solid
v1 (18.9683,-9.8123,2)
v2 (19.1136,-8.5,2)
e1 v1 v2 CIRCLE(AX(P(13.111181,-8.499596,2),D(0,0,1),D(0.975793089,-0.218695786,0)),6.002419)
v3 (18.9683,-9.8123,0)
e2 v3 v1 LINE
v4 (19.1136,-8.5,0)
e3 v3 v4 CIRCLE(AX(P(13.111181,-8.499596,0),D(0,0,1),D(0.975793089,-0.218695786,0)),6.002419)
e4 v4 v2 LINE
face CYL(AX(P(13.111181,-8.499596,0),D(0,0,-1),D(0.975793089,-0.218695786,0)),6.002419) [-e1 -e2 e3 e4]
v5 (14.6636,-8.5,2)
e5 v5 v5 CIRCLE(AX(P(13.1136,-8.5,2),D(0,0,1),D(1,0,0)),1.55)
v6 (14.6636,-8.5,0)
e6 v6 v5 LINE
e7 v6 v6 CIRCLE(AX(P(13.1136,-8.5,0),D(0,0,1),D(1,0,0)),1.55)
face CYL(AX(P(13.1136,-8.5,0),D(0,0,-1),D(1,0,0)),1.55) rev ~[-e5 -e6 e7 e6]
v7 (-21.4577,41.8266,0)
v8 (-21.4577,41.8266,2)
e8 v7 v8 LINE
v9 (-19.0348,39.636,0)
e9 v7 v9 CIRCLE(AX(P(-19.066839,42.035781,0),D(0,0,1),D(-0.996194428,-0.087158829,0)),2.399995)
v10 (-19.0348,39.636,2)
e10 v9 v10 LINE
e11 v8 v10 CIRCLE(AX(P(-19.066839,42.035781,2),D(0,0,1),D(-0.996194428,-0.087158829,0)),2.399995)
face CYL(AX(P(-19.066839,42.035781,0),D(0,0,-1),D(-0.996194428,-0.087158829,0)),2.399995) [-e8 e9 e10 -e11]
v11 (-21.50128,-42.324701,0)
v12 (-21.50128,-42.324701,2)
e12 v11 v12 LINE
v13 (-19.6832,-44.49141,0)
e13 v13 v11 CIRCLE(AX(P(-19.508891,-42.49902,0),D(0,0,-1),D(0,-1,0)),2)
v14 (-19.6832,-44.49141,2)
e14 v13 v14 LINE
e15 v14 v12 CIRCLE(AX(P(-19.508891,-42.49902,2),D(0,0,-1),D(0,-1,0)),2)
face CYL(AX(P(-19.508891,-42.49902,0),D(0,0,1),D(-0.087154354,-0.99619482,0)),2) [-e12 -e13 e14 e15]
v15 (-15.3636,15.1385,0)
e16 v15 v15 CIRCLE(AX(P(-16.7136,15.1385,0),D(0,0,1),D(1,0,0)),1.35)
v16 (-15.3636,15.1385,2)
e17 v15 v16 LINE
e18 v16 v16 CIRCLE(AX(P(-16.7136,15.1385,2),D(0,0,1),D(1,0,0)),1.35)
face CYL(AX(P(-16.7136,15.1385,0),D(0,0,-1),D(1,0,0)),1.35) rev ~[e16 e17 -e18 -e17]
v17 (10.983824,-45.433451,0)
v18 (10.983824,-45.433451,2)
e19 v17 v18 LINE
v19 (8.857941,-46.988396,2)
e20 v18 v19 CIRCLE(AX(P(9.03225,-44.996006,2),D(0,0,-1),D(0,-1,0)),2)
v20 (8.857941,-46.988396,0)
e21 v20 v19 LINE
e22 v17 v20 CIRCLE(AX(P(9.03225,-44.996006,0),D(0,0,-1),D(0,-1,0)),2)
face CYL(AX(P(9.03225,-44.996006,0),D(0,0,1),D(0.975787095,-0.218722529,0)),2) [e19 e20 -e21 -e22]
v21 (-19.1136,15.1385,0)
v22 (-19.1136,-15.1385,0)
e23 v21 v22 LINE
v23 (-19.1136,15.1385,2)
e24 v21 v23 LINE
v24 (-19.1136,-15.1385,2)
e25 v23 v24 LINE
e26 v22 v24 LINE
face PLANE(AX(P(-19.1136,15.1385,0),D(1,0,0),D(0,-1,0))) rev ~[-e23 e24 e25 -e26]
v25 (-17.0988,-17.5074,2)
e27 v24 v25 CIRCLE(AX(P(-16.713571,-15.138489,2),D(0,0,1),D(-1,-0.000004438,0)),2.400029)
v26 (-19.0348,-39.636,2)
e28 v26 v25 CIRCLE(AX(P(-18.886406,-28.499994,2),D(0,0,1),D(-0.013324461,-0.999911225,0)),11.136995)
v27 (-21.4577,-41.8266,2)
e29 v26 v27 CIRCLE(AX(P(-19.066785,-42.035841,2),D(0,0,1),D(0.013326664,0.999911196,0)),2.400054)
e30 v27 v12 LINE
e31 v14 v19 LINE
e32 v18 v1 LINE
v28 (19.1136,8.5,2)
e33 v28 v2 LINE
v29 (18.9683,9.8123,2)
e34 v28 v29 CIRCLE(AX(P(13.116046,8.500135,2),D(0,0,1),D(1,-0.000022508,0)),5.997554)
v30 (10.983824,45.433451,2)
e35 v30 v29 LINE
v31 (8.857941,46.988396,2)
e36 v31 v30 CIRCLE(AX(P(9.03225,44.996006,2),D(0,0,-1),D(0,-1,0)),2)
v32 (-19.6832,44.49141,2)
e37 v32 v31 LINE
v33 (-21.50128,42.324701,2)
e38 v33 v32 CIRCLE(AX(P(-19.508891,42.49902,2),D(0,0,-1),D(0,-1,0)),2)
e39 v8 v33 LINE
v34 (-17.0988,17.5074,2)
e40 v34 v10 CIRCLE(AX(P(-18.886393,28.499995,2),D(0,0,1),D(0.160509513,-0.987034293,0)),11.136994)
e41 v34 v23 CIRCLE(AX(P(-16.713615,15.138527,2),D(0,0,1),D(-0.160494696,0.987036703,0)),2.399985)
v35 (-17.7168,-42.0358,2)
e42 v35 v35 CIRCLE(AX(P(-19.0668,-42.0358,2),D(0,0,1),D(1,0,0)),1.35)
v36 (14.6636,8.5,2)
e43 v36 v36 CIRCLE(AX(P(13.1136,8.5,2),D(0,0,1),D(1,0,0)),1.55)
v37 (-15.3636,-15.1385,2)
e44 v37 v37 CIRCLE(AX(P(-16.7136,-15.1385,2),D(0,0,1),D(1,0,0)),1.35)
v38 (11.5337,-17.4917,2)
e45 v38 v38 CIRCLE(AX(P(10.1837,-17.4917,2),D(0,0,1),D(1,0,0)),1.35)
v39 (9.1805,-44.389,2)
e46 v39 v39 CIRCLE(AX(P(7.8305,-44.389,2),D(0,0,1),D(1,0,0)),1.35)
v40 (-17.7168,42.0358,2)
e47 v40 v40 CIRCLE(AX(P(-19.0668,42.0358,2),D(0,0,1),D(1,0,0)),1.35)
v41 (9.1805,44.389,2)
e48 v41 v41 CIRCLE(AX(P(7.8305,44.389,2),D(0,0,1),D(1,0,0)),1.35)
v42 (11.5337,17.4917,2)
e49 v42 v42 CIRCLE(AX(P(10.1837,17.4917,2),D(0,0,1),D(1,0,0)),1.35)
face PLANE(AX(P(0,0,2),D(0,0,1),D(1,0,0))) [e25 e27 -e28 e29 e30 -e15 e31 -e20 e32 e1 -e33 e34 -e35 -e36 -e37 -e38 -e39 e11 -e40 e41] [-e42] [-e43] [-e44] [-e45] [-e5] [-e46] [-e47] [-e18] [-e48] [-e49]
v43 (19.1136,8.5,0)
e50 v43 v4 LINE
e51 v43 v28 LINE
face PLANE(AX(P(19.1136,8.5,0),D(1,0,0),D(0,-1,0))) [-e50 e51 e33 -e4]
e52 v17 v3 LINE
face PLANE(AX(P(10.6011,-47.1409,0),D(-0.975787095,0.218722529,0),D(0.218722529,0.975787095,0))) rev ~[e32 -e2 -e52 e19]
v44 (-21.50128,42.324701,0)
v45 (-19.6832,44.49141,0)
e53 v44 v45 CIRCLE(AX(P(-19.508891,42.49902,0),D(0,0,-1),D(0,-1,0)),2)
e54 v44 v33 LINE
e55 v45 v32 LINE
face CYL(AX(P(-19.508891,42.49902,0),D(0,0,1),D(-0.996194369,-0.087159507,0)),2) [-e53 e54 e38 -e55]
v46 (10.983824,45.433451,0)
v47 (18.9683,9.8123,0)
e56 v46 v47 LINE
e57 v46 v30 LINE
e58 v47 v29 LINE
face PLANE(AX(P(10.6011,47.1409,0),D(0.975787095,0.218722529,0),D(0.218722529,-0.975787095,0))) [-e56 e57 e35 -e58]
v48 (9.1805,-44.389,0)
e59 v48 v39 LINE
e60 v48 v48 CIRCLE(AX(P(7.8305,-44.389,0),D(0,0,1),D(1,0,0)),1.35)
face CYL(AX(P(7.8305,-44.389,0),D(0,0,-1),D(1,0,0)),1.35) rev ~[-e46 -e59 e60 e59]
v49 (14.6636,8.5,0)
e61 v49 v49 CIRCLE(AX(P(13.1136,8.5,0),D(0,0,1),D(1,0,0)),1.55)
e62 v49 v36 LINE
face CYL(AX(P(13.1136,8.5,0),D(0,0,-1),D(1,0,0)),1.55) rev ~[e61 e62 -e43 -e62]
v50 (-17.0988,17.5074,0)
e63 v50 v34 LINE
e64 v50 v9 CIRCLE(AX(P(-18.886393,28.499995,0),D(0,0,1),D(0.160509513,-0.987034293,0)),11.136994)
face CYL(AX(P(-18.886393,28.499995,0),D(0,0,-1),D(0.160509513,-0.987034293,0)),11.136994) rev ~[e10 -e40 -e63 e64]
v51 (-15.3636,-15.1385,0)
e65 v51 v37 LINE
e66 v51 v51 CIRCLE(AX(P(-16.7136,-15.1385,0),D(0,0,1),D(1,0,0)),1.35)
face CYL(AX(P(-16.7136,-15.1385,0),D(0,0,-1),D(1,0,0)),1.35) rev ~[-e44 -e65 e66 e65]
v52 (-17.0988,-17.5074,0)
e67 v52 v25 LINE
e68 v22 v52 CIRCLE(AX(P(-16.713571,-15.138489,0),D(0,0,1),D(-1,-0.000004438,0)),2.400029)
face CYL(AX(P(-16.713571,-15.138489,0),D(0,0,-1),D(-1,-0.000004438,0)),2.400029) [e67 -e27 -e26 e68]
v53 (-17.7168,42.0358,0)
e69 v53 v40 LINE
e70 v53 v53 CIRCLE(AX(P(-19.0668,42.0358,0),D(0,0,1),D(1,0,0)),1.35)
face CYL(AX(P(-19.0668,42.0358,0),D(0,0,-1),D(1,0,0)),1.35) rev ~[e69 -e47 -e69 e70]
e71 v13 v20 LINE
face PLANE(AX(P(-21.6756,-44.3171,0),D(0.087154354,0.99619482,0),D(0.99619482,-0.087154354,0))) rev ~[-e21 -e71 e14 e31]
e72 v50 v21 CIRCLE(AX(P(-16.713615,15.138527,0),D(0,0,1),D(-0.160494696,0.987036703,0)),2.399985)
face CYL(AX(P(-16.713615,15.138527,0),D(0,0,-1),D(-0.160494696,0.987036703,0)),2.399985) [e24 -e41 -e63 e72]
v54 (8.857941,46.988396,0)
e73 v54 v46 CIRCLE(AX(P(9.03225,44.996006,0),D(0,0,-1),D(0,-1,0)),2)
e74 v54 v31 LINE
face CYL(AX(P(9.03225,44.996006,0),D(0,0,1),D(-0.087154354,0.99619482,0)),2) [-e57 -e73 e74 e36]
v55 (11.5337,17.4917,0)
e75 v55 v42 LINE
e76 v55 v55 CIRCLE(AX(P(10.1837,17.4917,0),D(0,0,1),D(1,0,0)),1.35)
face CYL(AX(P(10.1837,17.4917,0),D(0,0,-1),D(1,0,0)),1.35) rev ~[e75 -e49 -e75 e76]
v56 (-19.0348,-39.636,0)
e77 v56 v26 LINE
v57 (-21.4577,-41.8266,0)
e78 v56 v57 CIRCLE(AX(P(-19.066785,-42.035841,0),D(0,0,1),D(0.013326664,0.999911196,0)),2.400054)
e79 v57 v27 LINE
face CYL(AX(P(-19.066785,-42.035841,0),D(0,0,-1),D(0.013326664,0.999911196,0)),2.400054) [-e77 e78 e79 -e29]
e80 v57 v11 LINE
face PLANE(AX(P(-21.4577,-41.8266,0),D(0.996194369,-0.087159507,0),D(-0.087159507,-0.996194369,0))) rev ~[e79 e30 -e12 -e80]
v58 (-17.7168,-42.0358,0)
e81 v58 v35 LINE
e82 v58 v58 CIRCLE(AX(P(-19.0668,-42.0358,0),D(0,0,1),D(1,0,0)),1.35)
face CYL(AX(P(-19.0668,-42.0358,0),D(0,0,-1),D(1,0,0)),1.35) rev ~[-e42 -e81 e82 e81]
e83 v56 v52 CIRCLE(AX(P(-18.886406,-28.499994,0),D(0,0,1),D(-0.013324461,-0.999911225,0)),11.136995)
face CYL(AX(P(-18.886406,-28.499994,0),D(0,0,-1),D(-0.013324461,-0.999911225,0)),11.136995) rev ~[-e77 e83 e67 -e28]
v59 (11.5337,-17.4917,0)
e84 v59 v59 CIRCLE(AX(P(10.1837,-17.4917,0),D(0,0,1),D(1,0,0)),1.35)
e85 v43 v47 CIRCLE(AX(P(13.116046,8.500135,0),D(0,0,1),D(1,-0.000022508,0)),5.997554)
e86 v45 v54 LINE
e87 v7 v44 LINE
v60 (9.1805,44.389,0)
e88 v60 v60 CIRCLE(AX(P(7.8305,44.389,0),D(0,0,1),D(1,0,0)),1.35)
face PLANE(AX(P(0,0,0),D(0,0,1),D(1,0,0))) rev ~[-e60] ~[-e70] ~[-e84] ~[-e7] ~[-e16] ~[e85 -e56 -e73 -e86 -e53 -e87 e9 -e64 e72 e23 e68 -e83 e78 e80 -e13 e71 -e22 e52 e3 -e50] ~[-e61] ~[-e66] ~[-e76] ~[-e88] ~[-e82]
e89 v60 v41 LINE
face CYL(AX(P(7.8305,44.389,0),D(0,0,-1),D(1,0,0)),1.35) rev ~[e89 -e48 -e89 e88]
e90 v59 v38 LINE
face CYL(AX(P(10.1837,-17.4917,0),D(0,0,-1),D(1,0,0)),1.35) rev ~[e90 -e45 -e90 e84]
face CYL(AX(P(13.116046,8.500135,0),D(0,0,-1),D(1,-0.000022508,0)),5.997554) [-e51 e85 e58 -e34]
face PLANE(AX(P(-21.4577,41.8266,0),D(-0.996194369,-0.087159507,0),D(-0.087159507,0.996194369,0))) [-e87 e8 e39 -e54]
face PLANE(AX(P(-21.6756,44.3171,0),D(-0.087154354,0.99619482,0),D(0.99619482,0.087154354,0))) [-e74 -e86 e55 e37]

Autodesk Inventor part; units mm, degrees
ref_plane "YZ Plane" through (0, 0, 0) normal (1, 0, 0) x (0, 1, 0)
ref_plane "XZ Plane" through (0, 0, 0) normal (0, 1, 0) x (-1, 0, 0)
ref_plane "XY Plane" through (0, 0, 0) normal (0, 0, 1) x (1, 0, 0)
sketch "スケッチ1" plane through (0, 0, 0) normal (0, 0, 1) x (1, 0, 0)
  line L0 (-32.2352, 43.3932) -> (10.6011, 47.1409) construction
  line L1 (10.6011, 47.1409) -> (13.3901, 15.2627) construction
  line L2 (13.3901, 15.2627) -> (-29.4462, 11.515) construction
  line L3 (-29.4462, 11.515) -> (-32.2352, 43.3932) construction
  line L4 (-32.2352, 43.3932) -> (13.3901, 15.2627) construction
  line L5 (10.6011, 47.1409) -> (-29.4462, 11.515) construction
  line L6 (-30.8407, 27.4541) -> (11.9956, 31.2018) construction
  line L7 (7.8305, 44.389) -> (-19.0668, 42.0358) construction
  line L8 (-19.0668, 42.0358) -> (-16.7136, 15.1385) construction
  line L9 (-16.7136, 15.1385) -> (10.1837, 17.4917) construction
  line L10 (10.1837, 17.4917) -> (7.8305, 44.389) construction
  line L11 (7.8305, 44.389) -> (-16.7136, 15.1385) construction
  line L12 (-19.0668, 42.0358) -> (10.1837, 17.4917) construction
  circle A0 centre (-18.8864, 28.5) radius 10.5 construction
  circle A1 centre (-19.0668, 42.0358) radius 1.35
  line L13 (-5.6182, 43.2124) -> (-3.265, 16.3151) construction
  circle A2 centre (7.8305, 44.389) radius 1.35
  circle A3 centre (-16.7136, 15.1385) radius 1.35
  circle A4 centre (10.1837, 17.4917) radius 1.35
  arc A5 (-21.4577, 41.8266) -> (-19.0348, 39.636) centre (-19.0668, 42.0358) ccw
  arc A6 (-17.0988, 17.5074) -> (-19.0348, 39.636) centre (-18.8864, 28.5) ccw
  arc A7 (-17.0988, 17.5074) -> (-19.1136, 15.1385) centre (-16.7136, 15.1385) ccw
  line L14 (-21.4577, 41.8266) -> (-21.6756, 44.3171)
  circle A8 centre (13.1136, 8.5) radius 1.55
  circle A9 centre (13.1136, 8.5) radius 6 construction
  circle A10 centre (13.1136, 8.5) radius 4.6 construction
  line L15 (19.1136, 8.5) -> (19.1136, -8.5)
  line L16 (-19.1136, 15.1385) -> (-19.1136, -15.1385)
  line L17 (-19.1136, 0) -> (19.1136, 0) construction
  line L18 (-21.6756, 44.3171) -> (10.6011, 47.1409)
  line L19 (10.6011, 47.1409) -> (18.9683, 9.8123)
  arc A11 (19.1136, 8.5) -> (18.9683, 9.8123) centre (13.1136, 8.5) ccw
  circle A12 centre (-18.8864, -28.5) radius 10.5 construction
  circle A13 centre (-19.0668, -42.0358) radius 1.35
  circle A14 centre (7.8305, -44.389) radius 1.35
  circle A15 centre (-16.7136, -15.1385) radius 1.35
  circle A16 centre (10.1837, -17.4917) radius 1.35
  arc A17 (-19.0348, -39.636) -> (-21.4577, -41.8266) centre (-19.0668, -42.0358) ccw
  arc A18 (-19.0348, -39.636) -> (-17.0988, -17.5074) centre (-18.8864, -28.5) ccw
  arc A19 (-19.1136, -15.1385) -> (-17.0988, -17.5074) centre (-16.7136, -15.1385) ccw
  line L20 (-21.4577, -41.8266) -> (-21.6756, -44.3171)
  circle A20 centre (13.1136, -8.5) radius 1.55
  circle A21 centre (13.1136, -8.5) radius 6 construction
  line L21 (-21.6756, -44.3171) -> (10.6011, -47.1409)
  line L22 (10.6011, -47.1409) -> (18.9683, -9.8123)
  arc A22 (18.9683, -9.8123) -> (19.1136, -8.5) centre (13.1136, -8.5) ccw
  point P0 (0, 0)
  point P1 (-9.4225, 29.328)
  point P2 (-4.4416, 29.7638)
  dimension "d21" = 43
  dimension "d22" = 32
  dimension "d23" = 27
  dimension "d24" = 27
  dimension "d27" = 21
  dimension "d28" = 9.5
  dimension "d29" = 2.7
  dimension "d30" = 2.4
  dimension "d31" = 3.1
  dimension "d34" = 12
  dimension "d39" = 8.5
  dimension "d40" = 9.2
  dimension "d41" = 32
  dimension "d43" = 5
  dimension "d45" = 17
  dimension "d46" = 20
  dimension "d47" = 57
extrude "押し出し1" add sketch "スケッチ1" along normal blind 2
fillet "フィレット1" radius 2 4 edges at (-21.6756, 44.3171, 1) (-21.6756, -44.3171, 1) (10.6011, -47.1409, 1) (10.6011, 47.1409, 1)
properties part number "膝_メインフレーム_1" material "アルミニウム 2014-T4"
